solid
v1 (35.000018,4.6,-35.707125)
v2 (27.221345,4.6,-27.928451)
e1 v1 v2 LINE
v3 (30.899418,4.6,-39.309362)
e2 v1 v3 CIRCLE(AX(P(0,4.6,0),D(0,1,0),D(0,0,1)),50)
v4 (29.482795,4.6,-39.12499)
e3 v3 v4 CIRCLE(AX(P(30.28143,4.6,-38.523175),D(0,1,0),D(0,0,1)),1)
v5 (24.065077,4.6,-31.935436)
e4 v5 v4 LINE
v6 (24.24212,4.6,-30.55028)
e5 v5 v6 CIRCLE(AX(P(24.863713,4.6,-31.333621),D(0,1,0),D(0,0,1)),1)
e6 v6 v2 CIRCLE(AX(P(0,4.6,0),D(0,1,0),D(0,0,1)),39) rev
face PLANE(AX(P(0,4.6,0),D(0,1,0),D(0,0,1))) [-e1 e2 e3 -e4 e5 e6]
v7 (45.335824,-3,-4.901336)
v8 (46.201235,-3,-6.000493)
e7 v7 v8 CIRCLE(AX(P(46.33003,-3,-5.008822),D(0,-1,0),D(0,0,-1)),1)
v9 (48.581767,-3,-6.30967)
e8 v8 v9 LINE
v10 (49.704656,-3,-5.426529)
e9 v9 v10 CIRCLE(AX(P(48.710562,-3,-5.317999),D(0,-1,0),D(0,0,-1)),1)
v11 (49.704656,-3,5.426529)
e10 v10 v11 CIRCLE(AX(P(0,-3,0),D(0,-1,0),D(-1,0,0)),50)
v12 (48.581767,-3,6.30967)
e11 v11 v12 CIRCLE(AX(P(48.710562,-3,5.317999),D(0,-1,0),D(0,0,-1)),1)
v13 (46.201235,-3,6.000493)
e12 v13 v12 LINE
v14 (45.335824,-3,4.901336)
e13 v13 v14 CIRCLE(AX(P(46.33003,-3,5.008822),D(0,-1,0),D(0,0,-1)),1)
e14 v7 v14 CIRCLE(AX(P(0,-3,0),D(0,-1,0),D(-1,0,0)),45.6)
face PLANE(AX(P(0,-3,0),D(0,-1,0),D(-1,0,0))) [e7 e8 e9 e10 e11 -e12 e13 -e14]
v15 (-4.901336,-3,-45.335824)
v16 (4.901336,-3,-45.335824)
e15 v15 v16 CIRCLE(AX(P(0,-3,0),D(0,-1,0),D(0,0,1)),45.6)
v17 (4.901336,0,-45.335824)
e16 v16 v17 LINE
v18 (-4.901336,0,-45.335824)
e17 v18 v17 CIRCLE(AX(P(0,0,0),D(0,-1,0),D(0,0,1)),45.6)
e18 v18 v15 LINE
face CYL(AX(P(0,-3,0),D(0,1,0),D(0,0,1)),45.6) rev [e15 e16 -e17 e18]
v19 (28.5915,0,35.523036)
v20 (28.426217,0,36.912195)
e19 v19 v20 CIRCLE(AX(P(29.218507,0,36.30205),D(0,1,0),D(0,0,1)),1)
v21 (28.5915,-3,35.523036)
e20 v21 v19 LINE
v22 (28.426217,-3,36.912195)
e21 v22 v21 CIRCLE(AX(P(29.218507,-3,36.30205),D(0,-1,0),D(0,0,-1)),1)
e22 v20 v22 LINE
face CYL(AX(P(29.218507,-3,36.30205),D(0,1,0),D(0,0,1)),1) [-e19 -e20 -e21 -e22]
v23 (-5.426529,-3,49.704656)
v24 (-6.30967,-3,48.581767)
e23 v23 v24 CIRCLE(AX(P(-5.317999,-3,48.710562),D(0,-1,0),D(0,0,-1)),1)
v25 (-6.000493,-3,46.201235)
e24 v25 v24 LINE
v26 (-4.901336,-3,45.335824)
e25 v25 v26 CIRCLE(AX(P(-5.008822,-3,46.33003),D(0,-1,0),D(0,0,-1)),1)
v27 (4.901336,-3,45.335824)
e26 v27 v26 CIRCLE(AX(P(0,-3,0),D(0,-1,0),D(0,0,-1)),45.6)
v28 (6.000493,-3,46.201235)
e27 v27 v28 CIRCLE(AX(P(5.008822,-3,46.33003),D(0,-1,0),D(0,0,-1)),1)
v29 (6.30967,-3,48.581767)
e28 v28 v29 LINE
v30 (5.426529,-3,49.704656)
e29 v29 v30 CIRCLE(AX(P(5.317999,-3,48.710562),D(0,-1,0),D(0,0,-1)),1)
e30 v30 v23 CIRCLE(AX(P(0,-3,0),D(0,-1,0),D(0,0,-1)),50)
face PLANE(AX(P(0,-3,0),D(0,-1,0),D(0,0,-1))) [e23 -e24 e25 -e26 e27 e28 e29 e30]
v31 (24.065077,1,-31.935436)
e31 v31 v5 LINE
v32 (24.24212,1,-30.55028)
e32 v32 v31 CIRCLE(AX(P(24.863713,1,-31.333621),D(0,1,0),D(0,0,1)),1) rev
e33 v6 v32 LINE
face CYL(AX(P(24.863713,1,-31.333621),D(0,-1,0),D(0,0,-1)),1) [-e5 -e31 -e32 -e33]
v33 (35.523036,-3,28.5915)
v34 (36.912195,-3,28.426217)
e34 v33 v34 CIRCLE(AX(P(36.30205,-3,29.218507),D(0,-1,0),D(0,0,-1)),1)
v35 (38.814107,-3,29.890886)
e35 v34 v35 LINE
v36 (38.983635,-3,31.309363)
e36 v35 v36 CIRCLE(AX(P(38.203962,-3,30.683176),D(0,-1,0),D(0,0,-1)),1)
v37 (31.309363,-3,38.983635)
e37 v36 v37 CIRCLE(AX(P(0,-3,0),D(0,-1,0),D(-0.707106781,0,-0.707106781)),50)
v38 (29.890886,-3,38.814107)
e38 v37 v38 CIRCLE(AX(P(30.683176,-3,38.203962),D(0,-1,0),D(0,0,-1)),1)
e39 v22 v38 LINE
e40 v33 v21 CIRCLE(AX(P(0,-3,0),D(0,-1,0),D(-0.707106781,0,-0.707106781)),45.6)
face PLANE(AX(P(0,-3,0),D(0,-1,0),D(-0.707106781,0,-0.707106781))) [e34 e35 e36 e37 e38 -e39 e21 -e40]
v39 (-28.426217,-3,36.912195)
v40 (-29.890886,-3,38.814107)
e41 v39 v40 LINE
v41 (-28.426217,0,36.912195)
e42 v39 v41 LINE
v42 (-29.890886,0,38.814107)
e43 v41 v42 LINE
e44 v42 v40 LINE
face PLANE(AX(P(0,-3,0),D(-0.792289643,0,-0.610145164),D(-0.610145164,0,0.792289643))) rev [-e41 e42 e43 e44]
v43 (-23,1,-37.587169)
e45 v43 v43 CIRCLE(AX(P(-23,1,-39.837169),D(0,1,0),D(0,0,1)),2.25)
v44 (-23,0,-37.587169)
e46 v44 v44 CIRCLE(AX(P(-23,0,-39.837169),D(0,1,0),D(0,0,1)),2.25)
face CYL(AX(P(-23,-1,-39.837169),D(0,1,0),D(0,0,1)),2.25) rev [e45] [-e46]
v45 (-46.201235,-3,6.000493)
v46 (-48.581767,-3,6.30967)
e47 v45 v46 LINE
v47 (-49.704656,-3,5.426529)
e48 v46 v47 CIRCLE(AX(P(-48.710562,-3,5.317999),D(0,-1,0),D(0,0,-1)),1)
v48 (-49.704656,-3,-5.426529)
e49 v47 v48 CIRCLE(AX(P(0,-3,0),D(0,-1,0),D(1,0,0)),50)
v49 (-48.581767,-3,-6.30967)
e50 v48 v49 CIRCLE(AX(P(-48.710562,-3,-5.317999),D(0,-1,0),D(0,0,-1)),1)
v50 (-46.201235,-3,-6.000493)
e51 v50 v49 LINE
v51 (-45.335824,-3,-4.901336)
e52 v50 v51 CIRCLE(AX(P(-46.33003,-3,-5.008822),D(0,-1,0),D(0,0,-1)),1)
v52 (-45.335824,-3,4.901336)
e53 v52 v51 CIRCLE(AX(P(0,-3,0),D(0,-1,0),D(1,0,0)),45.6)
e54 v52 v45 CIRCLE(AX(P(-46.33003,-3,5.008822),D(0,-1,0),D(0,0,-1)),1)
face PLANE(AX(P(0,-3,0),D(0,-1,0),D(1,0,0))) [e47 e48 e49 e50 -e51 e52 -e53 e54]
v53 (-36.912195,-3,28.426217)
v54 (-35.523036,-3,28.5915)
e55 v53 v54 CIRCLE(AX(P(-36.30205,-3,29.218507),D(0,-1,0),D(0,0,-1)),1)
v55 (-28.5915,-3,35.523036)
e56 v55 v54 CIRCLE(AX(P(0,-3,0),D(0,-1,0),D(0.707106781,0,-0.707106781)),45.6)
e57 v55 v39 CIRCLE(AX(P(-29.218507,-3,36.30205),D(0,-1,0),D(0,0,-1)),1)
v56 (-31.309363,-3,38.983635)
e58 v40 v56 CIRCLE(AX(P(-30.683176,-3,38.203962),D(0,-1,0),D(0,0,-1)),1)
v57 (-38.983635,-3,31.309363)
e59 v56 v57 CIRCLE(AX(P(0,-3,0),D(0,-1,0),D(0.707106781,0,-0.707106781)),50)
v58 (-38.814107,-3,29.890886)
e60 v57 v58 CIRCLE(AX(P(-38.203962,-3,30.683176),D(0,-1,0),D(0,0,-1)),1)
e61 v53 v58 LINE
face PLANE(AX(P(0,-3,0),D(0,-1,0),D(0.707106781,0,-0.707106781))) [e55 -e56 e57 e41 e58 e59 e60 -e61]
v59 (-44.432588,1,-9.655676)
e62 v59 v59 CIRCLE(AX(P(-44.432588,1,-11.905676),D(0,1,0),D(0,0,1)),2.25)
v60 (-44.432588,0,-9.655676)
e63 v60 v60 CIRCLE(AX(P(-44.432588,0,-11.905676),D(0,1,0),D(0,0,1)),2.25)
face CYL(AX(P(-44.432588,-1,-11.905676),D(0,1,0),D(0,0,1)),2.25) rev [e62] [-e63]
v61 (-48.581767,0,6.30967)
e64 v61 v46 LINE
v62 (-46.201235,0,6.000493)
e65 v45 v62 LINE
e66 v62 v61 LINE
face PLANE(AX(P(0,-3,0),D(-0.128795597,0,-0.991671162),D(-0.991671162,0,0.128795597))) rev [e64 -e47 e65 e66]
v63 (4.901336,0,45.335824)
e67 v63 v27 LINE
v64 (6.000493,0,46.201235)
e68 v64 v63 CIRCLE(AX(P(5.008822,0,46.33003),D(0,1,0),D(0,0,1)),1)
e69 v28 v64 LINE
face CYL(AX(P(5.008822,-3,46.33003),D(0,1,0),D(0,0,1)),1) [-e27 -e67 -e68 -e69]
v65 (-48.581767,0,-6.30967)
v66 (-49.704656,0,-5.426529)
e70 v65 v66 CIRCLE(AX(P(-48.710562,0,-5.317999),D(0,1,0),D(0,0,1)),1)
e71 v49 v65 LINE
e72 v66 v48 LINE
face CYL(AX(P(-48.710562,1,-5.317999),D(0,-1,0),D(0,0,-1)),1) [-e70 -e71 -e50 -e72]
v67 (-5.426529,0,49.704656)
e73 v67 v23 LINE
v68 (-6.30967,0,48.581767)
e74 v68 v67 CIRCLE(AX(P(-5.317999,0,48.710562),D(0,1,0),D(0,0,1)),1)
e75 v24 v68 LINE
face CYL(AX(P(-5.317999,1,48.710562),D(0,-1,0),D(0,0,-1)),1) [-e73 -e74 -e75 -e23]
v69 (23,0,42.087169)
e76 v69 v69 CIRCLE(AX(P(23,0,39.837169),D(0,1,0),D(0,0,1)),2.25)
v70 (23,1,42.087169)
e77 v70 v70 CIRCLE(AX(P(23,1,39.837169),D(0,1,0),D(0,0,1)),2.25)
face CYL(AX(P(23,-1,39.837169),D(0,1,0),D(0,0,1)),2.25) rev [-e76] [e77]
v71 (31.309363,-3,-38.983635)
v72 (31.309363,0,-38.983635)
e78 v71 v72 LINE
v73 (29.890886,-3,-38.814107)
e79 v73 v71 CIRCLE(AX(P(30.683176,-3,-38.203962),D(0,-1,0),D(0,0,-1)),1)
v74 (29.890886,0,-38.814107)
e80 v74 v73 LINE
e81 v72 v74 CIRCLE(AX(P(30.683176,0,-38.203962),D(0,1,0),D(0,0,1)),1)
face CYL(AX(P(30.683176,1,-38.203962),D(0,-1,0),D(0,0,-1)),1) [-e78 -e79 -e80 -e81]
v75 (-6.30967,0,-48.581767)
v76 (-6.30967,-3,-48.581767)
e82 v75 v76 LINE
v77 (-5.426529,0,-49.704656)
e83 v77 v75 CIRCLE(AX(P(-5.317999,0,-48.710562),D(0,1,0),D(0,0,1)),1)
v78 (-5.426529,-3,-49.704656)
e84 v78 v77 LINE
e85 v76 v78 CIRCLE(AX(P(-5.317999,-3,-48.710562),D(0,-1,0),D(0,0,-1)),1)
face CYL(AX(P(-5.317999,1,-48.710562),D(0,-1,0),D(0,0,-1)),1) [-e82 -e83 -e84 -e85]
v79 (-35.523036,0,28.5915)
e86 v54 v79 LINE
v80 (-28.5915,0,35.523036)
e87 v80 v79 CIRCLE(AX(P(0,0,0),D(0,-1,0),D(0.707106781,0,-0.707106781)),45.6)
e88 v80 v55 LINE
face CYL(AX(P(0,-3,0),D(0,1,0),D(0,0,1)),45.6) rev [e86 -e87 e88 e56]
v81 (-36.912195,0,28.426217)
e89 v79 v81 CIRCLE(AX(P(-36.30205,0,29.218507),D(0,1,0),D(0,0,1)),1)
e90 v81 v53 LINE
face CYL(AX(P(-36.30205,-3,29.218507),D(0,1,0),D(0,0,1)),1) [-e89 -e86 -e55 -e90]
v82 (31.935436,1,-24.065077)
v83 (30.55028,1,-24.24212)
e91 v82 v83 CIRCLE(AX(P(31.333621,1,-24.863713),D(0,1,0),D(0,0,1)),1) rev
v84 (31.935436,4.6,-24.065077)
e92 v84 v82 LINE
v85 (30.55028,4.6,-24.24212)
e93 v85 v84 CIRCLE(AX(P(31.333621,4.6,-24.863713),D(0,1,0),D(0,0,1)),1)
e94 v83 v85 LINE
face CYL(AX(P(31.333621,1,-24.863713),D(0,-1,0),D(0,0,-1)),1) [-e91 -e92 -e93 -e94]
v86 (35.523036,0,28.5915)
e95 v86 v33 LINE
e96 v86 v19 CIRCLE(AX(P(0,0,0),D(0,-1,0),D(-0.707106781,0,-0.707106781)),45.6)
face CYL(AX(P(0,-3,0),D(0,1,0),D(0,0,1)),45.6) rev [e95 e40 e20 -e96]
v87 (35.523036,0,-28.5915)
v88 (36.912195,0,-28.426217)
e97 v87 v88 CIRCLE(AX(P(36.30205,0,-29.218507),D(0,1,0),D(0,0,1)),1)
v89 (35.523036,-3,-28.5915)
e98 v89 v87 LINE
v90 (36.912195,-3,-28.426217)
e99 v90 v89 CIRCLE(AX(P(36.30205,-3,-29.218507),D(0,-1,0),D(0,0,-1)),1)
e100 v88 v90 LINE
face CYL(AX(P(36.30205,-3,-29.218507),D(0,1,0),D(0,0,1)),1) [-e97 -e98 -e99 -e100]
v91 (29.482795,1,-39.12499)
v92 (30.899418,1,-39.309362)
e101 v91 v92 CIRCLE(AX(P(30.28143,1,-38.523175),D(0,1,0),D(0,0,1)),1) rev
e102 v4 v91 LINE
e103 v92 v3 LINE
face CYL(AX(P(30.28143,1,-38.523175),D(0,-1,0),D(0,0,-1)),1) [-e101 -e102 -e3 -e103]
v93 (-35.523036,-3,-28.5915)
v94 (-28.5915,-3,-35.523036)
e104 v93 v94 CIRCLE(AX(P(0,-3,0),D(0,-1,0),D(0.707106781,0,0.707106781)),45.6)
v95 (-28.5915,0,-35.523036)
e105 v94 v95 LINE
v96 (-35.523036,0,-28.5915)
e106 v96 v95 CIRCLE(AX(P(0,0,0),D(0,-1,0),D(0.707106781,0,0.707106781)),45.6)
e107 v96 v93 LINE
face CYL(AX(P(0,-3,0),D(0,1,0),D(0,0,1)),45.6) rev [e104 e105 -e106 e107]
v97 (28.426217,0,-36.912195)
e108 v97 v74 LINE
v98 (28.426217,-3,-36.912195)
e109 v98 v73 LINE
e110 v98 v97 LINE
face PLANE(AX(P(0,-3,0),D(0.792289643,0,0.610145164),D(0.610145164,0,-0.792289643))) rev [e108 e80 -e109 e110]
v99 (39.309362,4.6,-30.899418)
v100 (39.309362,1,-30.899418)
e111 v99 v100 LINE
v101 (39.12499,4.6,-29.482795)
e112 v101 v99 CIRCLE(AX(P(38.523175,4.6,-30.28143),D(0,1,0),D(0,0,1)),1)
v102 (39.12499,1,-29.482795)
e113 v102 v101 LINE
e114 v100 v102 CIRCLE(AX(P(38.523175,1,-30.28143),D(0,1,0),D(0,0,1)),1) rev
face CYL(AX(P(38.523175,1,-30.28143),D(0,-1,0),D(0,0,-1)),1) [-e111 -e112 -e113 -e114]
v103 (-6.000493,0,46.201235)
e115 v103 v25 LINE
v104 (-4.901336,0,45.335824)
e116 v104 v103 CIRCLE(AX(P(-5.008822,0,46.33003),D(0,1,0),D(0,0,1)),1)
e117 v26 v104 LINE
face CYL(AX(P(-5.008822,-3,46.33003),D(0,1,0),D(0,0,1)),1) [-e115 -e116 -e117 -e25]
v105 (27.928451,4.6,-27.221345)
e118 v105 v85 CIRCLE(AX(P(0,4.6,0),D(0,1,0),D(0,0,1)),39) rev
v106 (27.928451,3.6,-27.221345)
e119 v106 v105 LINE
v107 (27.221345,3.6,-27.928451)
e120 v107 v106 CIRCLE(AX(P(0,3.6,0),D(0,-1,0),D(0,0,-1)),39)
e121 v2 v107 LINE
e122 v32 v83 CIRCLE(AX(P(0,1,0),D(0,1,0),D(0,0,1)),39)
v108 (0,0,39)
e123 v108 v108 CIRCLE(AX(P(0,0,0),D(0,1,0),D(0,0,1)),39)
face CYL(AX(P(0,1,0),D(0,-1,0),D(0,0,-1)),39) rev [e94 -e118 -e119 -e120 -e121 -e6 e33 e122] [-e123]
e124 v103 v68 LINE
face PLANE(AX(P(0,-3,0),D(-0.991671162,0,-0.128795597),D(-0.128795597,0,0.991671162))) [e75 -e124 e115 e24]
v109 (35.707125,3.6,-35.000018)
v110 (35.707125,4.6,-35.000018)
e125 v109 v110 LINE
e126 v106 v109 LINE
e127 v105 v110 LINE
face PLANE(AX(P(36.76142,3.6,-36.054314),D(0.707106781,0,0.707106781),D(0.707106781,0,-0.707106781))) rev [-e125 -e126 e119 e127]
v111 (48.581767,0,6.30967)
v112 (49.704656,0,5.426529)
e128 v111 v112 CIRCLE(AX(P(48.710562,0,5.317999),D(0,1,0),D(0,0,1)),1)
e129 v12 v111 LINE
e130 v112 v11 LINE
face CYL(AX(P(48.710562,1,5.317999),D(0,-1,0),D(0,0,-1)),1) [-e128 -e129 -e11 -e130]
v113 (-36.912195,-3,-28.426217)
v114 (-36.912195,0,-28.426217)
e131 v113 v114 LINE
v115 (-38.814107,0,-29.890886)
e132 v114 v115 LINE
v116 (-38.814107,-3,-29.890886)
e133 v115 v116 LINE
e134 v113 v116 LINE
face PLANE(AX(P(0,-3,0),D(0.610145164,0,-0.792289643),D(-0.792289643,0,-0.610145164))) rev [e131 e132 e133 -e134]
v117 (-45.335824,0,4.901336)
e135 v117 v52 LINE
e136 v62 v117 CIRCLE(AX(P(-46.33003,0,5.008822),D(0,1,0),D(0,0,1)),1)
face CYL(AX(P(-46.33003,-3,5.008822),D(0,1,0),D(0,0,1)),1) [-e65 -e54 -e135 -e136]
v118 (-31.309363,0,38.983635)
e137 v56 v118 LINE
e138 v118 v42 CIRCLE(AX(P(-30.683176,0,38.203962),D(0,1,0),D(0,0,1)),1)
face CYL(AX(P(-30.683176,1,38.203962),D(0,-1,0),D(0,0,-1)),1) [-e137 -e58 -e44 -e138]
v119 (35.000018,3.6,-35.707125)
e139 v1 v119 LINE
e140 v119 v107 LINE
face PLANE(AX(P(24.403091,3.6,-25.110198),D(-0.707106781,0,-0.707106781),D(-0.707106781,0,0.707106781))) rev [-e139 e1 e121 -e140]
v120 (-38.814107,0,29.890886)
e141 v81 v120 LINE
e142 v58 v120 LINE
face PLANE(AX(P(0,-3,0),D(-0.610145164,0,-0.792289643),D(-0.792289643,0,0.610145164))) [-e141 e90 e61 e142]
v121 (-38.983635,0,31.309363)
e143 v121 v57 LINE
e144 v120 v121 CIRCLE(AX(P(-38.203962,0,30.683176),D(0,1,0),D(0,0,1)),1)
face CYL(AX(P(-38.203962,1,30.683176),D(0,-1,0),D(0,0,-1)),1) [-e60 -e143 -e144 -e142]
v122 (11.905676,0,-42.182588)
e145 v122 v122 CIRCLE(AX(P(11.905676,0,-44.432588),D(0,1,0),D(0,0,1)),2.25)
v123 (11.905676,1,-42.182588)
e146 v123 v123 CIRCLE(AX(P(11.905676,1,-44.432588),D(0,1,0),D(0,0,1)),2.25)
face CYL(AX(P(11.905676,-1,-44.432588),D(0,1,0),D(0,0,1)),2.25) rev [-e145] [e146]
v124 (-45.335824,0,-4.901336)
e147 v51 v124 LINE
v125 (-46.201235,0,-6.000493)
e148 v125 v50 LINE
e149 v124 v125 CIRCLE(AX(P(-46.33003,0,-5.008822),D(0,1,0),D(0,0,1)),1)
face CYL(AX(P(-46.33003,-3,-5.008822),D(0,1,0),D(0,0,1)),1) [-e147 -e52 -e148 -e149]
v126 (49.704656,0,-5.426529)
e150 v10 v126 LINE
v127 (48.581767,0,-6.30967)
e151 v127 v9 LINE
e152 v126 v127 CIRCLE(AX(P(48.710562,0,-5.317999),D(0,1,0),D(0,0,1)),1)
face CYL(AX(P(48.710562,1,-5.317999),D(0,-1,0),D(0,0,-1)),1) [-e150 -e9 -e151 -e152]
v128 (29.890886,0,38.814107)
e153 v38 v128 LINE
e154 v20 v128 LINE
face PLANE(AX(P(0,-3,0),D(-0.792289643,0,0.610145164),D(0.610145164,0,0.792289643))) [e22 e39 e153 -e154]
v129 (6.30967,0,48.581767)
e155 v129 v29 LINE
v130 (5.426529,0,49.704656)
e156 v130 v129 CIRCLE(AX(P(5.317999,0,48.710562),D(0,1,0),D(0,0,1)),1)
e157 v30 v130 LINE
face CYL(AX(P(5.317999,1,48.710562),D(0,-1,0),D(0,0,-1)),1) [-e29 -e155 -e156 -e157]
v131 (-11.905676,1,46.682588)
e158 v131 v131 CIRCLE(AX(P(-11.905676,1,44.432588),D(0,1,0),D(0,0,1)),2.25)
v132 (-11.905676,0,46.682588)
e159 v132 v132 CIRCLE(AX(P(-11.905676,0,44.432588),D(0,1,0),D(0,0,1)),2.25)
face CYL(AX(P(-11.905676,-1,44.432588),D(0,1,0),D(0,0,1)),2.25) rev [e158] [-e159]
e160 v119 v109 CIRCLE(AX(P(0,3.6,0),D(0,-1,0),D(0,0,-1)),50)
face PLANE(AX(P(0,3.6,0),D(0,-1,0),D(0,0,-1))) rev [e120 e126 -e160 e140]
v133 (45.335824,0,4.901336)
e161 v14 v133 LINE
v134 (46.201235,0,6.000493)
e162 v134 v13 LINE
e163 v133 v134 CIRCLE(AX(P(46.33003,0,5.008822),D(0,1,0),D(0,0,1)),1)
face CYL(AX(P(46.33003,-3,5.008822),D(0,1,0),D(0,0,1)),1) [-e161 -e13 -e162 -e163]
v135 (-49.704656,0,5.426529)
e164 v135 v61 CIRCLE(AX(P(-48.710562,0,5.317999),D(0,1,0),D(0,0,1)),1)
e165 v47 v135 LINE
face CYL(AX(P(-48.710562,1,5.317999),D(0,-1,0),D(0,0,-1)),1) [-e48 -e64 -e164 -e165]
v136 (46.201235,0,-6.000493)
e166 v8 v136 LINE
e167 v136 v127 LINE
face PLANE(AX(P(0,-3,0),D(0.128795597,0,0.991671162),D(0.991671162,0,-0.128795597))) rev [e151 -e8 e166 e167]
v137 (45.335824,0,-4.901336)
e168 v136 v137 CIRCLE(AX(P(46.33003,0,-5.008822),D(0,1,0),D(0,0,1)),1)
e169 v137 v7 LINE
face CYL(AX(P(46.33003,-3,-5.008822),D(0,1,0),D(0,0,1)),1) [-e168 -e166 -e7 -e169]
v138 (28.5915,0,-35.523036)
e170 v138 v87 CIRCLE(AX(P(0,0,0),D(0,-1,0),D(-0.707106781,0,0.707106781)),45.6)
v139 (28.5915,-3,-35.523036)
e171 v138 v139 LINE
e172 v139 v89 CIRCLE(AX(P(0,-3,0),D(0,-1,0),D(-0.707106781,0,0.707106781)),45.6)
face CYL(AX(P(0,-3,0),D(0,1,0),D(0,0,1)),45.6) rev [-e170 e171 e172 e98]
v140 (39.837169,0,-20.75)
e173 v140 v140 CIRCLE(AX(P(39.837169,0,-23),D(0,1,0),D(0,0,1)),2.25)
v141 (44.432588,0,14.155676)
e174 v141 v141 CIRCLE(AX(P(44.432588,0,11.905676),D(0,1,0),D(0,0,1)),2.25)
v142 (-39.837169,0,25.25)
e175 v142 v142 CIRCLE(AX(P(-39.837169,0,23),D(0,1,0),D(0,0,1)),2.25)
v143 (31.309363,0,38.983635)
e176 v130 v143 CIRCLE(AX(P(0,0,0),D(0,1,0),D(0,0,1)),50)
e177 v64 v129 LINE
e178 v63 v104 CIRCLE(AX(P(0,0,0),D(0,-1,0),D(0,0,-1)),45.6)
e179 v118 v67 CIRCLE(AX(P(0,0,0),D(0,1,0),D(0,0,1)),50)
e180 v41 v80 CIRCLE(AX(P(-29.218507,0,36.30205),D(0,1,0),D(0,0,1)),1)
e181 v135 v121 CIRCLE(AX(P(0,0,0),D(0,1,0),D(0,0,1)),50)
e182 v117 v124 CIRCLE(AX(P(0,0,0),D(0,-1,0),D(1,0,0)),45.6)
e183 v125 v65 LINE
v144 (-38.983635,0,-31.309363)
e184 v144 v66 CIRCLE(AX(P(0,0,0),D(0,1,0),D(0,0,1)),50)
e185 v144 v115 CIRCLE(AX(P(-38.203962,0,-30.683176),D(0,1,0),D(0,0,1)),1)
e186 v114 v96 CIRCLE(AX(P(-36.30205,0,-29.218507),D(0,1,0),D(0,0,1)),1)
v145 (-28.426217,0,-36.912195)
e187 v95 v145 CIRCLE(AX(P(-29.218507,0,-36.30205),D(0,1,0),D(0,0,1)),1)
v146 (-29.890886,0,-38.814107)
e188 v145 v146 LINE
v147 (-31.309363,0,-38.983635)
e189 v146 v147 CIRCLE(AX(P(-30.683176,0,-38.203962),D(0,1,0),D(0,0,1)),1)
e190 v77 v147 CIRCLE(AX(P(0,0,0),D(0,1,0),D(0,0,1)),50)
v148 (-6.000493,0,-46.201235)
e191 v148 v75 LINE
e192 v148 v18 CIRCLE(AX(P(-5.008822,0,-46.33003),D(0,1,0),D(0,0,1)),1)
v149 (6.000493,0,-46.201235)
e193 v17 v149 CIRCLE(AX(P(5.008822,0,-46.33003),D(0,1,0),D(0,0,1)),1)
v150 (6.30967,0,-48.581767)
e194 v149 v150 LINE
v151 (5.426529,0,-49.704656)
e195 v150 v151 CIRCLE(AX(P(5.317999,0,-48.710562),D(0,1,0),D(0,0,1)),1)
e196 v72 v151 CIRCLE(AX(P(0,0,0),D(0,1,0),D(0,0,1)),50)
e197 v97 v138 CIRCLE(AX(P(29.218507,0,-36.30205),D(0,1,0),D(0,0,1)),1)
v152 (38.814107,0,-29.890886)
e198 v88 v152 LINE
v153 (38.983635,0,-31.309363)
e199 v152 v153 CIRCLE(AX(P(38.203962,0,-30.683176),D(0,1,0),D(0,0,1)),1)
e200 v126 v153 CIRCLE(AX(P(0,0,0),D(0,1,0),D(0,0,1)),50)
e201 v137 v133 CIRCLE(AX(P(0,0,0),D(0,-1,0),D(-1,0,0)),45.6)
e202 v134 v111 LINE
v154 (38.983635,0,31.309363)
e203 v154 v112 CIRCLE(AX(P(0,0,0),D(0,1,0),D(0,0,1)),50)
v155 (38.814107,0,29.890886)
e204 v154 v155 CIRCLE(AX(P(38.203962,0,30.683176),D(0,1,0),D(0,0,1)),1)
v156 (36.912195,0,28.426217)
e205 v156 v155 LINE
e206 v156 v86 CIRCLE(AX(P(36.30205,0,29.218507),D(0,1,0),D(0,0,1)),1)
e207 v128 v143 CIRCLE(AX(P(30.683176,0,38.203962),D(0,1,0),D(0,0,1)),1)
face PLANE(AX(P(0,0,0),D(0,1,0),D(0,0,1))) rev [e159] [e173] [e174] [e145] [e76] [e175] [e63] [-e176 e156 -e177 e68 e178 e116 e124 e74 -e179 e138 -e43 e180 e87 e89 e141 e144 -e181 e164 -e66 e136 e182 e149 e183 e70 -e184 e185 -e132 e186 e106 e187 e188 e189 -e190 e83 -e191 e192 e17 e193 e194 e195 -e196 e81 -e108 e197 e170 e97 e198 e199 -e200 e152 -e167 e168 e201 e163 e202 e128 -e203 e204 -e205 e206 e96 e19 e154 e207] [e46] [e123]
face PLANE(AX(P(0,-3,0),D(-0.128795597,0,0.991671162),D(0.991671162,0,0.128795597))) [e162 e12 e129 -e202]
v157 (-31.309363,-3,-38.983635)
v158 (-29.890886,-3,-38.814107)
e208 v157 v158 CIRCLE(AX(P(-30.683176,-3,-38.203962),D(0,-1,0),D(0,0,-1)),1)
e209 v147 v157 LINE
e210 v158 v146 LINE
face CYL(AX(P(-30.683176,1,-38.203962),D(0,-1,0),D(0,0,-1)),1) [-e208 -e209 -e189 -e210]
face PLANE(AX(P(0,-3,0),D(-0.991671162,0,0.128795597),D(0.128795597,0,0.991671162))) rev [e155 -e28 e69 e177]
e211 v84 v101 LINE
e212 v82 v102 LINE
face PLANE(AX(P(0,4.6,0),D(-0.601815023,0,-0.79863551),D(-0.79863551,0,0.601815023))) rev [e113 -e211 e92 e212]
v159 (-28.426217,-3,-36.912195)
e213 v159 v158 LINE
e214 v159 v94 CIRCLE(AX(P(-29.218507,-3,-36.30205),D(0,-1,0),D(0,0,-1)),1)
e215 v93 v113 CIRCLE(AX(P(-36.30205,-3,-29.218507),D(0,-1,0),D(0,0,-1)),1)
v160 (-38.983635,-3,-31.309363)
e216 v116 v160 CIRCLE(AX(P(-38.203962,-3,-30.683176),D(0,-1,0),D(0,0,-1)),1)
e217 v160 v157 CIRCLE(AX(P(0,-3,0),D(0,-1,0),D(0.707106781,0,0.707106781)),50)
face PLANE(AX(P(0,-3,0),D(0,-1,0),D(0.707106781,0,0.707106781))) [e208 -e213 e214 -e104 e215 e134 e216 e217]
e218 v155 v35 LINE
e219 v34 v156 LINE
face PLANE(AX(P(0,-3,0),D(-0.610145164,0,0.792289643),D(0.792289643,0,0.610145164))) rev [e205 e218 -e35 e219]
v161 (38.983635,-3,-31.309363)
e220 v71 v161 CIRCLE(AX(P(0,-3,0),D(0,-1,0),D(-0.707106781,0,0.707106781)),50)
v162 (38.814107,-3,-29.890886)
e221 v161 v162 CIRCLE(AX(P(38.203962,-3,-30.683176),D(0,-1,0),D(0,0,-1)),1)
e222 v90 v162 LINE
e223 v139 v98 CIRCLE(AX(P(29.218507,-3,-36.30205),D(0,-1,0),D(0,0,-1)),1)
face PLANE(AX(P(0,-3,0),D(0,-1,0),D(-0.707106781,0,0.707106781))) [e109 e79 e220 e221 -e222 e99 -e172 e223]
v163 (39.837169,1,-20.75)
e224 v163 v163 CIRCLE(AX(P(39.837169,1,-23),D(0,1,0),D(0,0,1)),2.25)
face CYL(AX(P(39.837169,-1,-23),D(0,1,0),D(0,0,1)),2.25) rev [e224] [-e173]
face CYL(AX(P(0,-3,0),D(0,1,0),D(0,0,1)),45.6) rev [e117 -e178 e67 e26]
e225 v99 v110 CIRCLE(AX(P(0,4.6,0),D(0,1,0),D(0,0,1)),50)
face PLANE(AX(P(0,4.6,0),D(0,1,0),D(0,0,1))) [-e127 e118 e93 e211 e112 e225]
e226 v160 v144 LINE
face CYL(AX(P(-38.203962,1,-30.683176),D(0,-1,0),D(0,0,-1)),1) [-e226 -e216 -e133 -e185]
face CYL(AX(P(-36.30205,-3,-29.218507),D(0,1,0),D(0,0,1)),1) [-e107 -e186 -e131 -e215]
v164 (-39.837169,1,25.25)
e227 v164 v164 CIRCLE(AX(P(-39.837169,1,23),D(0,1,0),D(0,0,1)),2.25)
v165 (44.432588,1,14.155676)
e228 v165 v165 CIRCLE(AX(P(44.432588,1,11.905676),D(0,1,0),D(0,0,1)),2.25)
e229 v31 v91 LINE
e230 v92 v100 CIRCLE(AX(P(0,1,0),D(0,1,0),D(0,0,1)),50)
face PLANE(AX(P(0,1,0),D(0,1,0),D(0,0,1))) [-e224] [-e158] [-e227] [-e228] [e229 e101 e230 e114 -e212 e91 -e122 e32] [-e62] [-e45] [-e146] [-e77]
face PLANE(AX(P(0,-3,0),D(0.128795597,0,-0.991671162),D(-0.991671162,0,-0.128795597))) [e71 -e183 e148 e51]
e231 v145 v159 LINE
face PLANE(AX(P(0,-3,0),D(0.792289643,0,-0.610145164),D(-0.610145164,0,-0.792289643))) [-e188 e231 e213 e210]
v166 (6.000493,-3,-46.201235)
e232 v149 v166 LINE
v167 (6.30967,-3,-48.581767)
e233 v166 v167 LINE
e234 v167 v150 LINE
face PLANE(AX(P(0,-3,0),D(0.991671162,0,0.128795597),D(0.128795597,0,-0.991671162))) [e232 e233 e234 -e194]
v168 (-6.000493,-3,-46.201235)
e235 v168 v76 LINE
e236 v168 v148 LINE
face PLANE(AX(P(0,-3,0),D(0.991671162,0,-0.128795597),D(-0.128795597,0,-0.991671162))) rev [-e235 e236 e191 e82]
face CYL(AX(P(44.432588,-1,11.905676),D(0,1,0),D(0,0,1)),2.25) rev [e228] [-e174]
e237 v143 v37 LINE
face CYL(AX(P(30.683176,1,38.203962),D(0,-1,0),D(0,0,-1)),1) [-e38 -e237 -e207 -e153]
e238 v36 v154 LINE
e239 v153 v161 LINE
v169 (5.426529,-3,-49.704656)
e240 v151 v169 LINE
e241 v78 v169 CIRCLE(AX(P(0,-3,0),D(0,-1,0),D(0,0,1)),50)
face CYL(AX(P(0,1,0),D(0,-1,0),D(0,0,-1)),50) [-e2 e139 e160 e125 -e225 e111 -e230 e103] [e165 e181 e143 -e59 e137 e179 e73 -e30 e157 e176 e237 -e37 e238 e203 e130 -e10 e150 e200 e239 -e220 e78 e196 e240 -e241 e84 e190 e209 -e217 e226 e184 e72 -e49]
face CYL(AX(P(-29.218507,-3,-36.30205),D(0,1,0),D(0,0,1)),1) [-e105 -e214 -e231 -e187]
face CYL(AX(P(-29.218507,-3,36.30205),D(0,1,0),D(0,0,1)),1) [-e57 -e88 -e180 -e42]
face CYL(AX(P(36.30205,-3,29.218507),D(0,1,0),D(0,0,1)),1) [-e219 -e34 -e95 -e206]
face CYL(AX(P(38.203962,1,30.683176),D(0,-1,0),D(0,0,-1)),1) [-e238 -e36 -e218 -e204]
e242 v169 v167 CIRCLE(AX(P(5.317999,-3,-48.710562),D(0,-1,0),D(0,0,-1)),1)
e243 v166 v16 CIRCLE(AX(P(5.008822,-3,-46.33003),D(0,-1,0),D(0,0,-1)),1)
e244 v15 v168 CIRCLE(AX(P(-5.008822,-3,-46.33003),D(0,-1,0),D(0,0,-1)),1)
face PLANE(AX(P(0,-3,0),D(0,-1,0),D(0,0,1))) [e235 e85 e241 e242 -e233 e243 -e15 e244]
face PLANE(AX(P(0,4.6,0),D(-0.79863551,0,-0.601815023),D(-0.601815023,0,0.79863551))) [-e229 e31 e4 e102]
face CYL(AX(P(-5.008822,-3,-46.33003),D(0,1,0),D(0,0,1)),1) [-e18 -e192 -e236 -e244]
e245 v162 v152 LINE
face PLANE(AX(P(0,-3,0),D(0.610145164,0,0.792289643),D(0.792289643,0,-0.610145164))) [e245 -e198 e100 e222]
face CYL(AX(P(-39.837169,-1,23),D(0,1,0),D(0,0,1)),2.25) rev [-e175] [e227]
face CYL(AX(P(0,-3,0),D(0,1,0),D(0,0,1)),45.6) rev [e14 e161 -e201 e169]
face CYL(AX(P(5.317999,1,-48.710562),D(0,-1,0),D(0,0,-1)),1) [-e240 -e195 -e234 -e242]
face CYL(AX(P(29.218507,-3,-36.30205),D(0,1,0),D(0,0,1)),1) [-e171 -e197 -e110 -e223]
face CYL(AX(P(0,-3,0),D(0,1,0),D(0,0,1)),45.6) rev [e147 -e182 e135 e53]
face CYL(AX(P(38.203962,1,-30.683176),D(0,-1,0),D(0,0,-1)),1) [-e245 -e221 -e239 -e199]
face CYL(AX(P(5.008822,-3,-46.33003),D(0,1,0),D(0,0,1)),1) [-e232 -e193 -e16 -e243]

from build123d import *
from build123d.topology import SkipClean

# Parameters (mm, degrees)
SKETCH_1_R               = 50
SKETCH_1_R_2             = 39
EXTRUDE_1_DEPTH          = 1
SKETCH_2_R               = 2.25
CUT_EXTRUDE_1_DEPTH      = 2
EXTRUDE_START            = 3
EXTRUDE_2_DEPTH          = 3
FILLET_1_R               = 1
PATTERN_CIRCULAR_1_COUNT = 8
EXTRUDE_3_DEPTH          = 3.6
FILLET_2_R               = 1
FILLET_3_R               = 1
CUT_EXTRUDE_2_DEPTH      = 1


with BuildPart() as part:
    # 草图1 → 凸台-拉伸1 (new body)
    with BuildSketch(Plane(origin=(0, 0, 0), x_dir=(1, 0, 0), z_dir=(0, 1, 0))):
        with Locations(Location((0, 0, 0), (0, 0, 270))):
            Circle(SKETCH_1_R)
        with Locations(Location((0, 0, 0), (0, 0, 270))):
            Circle(SKETCH_1_R_2, mode=Mode.SUBTRACT)
    extrude(amount=EXTRUDE_1_DEPTH)

    # 草图2 → 切除-拉伸1 (cut)
    with BuildSketch(Plane(origin=(0, 1, 0), x_dir=(1, 0, 0), z_dir=(0, 1, 0))):
        with Locations(Location((11.905676075, 44.432588009, 0), (0, 0, 270))):
            Circle(SKETCH_2_R)
        with Locations(Location((-23, 39.837168574, 0), (0, 0, 270))):
            Circle(SKETCH_2_R)
        with Locations(Location((39.837168574, 23, 0), (0, 0, 270))):
            Circle(SKETCH_2_R)
        with Locations(Location((44.432588009, -11.905676075, 0), (0, 0, 270))):
            Circle(SKETCH_2_R)
        with Locations(Location((23, -39.837168574, 0), (0, 0, 270))):
            Circle(SKETCH_2_R)
        with Locations(Location((-11.905676075, -44.432588009, 0), (0, 0, 270))):
            Circle(SKETCH_2_R)
        with Locations(Location((-39.837168574, -23, 0), (0, 0, 270))):
            Circle(SKETCH_2_R)
        with Locations(Location((-44.432588009, 11.905676075, 0), (0, 0, 270))):
            Circle(SKETCH_2_R)
    extrude(amount=-CUT_EXTRUDE_1_DEPTH, mode=Mode.SUBTRACT)

    # 草图3 → 凸台-拉伸2 (add)
    with BuildSketch(Plane.XZ.offset(EXTRUDE_START)):
        with BuildLine():
            ThreePointArc((-5.873079204, 45.220205005), (-2.942673256, 45.504952193), (0, 45.6))
            Line((0, 45.6), (0, 50))
            ThreePointArc((0, 50), (-3.226615413, 49.895780914), (-6.439779829, 49.583558119))
            Line((-6.439779829, 49.583558119), (-5.873079204, 45.220205005))
        make_face()
        with BuildLine():
            Line((0, 50), (0, 45.6))
            ThreePointArc((0, 45.6), (2.942673256, 45.504952193), (5.873079204, 45.220205005))
            Line((5.873079204, 45.220205005), (6.439779829, 49.583558119))
            ThreePointArc((6.439779829, 49.583558119), (3.226615413, 49.895780914), (0, 50))
        make_face()
    extrude_2 = extrude(amount=-EXTRUDE_2_DEPTH)

    # 圆角1
    fillet_1_edges = [part.edges().sort_by_distance(p)[0] for p in [
        (-5.873079204, -1.5, 45.220205005),
        (5.873079204, -1.5, 45.220205005),
    ]]
    fillet(fillet_1_edges, radius=FILLET_1_R)

    # 阵列(圆周)1: 凸台-拉伸2 ×8 about axis
    with SkipClean():  # the faces are left unmerged after this step: merging them gives an invalid solid
        pattern_circular_1_axis = Axis((0, 0, 0), (0, 1, 0))
        for i in range(1, PATTERN_CIRCULAR_1_COUNT):
            add(extrude_2.rotate(pattern_circular_1_axis, i * 360 / PATTERN_CIRCULAR_1_COUNT))

    # 草图4 → 凸台-拉伸3 (add)
    with SkipClean():  # the faces are left unmerged after this step: merging them gives an invalid solid
        with BuildSketch(Plane(origin=(0, 1, 0), x_dir=(1, 0, 0), z_dir=(0, 1, 0))):
            with BuildLine():
                ThreePointArc((23.470785903, 31.146784892), (27.577164466, 27.577164466), (31.146784892, 23.470785903))
                Line((31.146784892, 23.470785903), (39.931775502, 30.090751158))
                ThreePointArc((39.931775502, 30.090751158), (35.355339059, 35.355339059), (30.090751158, 39.931775502))
                Line((30.090751158, 39.931775502), (23.470785903, 31.146784892))
            make_face()
        extrude(amount=EXTRUDE_3_DEPTH)

    # 圆角2
    # the kernel refuses this fillet: 1 mm, written as the material it takes off along each edge
    with BuildSketch(Plane(origin=(30.090751158, 1, -39.931775502), x_dir=(0.7924526369681321, 0, 0.6099334538802196), z_dir=(0, 1, 0))) as fillet_2_piece_1:
        with BuildLine():
            CenterArc((1.010256684, -0.999947932), FILLET_2_R, 89.415308597, 91.169382806)
            Line((0.010308753, -1.010152545), (0, 0))
            ThreePointArc((0, 0), (0.510230649, 0.002603421), (1.020461297, 0))
        make_face()
    extrude(amount=6.151153243, mode=Mode.SUBTRACT)
    with BuildSketch(Plane(origin=(23.470785903, 1, -31.146784892), x_dir=(0.791049828797745, 0, 0.6117517211737605), z_dir=(0, 1, 0))) as fillet_2_piece_2:
        with BuildLine():
            CenterArc((0.98757717, 0.99992186), FILLET_2_R, 180.716271869, 88.567456262)
            Line((-0.01234469, 0.987420883), (0, 0))
            ThreePointArc((0, 0), (0.487538096, 0.00304747), (0.975076193, 0))
        make_face()
    extrude(amount=6.068745116, mode=Mode.SUBTRACT)
    with BuildSketch(Plane(origin=(31.146784892, 1, -23.470785903), x_dir=(-0.611751721173858, 0, -0.7910498287976696), z_dir=(0, 1, 0))) as fillet_2_piece_3:
        with BuildLine():
            CenterArc((0.98757717, -0.99992186), FILLET_2_R, 90.716271869, 88.567456262)
            Line((-0.01234469, -0.987420883), (0, 0))
            ThreePointArc((0, 0), (0.487538096, -0.00304747), (0.975076193, 0))
        make_face()
    extrude(amount=6.068745116, mode=Mode.SUBTRACT)
    with BuildSketch(Plane(origin=(39.931775502, 1, -30.090751158), x_dir=(-0.6099334538803046, 0, -0.7924526369680664), z_dir=(0, 1, 0))) as fillet_2_piece_4:
        with BuildLine():
            CenterArc((1.010256684, 0.999947932), FILLET_2_R, 179.415308597, 91.169382806)
            Line((0.010308753, 1.010152545), (0, 0))
            ThreePointArc((0, 0), (0.510230649, -0.002603421), (1.020461297, 0))
        make_face()
    extrude(amount=6.151153243, mode=Mode.SUBTRACT)

    # 圆角3
    # the kernel refuses this fillet: 1 mm, written as the material it takes off along each edge
    with BuildSketch(Plane(origin=(5.873079204, -5.473172877, -45.220205005), x_dir=(-0.9929960778530438, 0, -0.11814732061486549), z_dir=(0, 1, 0)), Plane(origin=(-27.822619474, -5.473172877, -36.128407737), x_dir=(-0.7856970319273249, 0, 0.6186114887557392), z_dir=(0, 1, 0)), Plane(origin=(-45.220205005, -5.473172877, -5.873079204), x_dir=(-0.11814732061486613, 0, 0.9929960778530437), z_dir=(0, 1, 0)), Plane(origin=(-36.128407737, -5.473172877, 27.822619474), x_dir=(0.6186114887557375, 0, 0.7856970319273263), z_dir=(0, 1, 0)), Plane(origin=(27.822619474, -5.473172877, 36.128407737), x_dir=(0.7856970319273222, 0, -0.6186114887557427), z_dir=(0, 1, 0)), Plane(origin=(45.220205005, -5.473172877, 5.873079204), x_dir=(0.11814732061486592, 0, -0.9929960778530437), z_dir=(0, 1, 0)), Plane(origin=(36.128407737, -5.473172877, -27.822619474), x_dir=(-0.6186114887557427, 0, -0.7856970319273222), z_dir=(0, 1, 0))) as fillet_3_piece_1:
        with BuildLine():
            CenterArc((0.989327342, -0.999942429), FILLET_3_R, 90.614808775, 88.770382449)
            Line((-0.010615087, -0.989212198), (0, 0))
            ThreePointArc((0, 0), (0.489298555, -0.002625219), (0.978597111, 0))
        make_face()
    extrude(amount=5.473172877, mode=Mode.SUBTRACT)
    with BuildSketch(Plane(origin=(-5.873079204, -5.473172877, -45.220205005), x_dir=(-0.1287955965775636, 0, -0.9916711623830904), z_dir=(0, 1, 0)), Plane(origin=(-36.128407737, -5.473172877, -27.822619474), x_dir=(-0.7922896433551908, 0, -0.6101451639012675), z_dir=(0, 1, 0)), Plane(origin=(-45.220205005, -5.473172877, 5.873079204), x_dir=(-0.9916711623830903, 0, 0.12879559657756398), z_dir=(0, 1, 0)), Plane(origin=(-27.822619474, -5.473172877, 36.128407737), x_dir=(-0.6101451639012675, 0, 0.7922896433551908), z_dir=(0, 1, 0)), Plane(origin=(36.128407737, -5.473172877, 27.822619474), x_dir=(0.7922896433551925, 0, 0.6101451639012652), z_dir=(0, 1, 0)), Plane(origin=(45.220205005, -5.473172877, -5.873079204), x_dir=(0.9916711623830904, 0, -0.1287955965775636), z_dir=(0, 1, 0)), Plane(origin=(27.822619474, -5.473172877, -36.128407737), x_dir=(0.6101451639012653, 0, -0.7922896433551926), z_dir=(0, 1, 0))) as fillet_3_piece_2:
        with BuildLine():
            CenterArc((0.989269151, -1), FILLET_3_R, 90, 88.770382449)
            ThreePointArc((-0.010500574, -0.978540773), (-0.002625219, -0.489298555), (0, 0))
            Line((0, 0), (0.989269151, 0))
        make_face()
    extrude(amount=5.473172877, mode=Mode.SUBTRACT)
    with BuildSketch(Plane(origin=(-6.439779829, -5.551153243, -49.583558119), x_dir=(0.9929338368493981, 0, -0.1186692699882022), z_dir=(0, 1, 0)), Plane(origin=(6.439779829, -5.551153243, 49.583558119), x_dir=(-0.9929338368493983, 0, 0.1186692699882015), z_dir=(0, 1, 0)), Plane(origin=(39.614482168, -5.551153243, 30.507258195), x_dir=(-0.6181984037786714, 0, 0.7860220948329013), z_dir=(0, 1, 0)), Plane(origin=(49.583558119, -5.551153243, -6.439779829), x_dir=(0.11866926998820088, 0, 0.9929338368493983), z_dir=(0, 1, 0)), Plane(origin=(30.507258195, -5.551153243, -39.614482168), x_dir=(0.7860220948329028, 0, 0.6181984037786699), z_dir=(0, 1, 0))) as fillet_3_piece_3:
        with BuildLine():
            CenterArc((1.010256684, -0.999947932), FILLET_3_R, 89.415308597, 91.169382806)
            Line((0.010308753, -1.010152545), (0, 0))
            ThreePointArc((0, 0), (0.510230649, 0.002603421), (1.020461297, 0))
        make_face()
    extrude(amount=5.551153243, mode=Mode.SUBTRACT)
    with BuildSketch(Plane(origin=(6.439779829, -5.551153243, -49.583558119), x_dir=(-0.9929338368493981, 0, -0.1186692699882022), z_dir=(0, 1, 0)), Plane(origin=(30.507258195, -5.551153243, 39.614482168), x_dir=(0.7860220948329047, 0, -0.6181984037786672), z_dir=(0, 1, 0)), Plane(origin=(49.583558119, -5.551153243, 6.439779829), x_dir=(0.11866926998820333, 0, -0.992933836849398), z_dir=(0, 1, 0)), Plane(origin=(39.614482168, -5.551153243, -30.507258195), x_dir=(-0.6181984037786714, 0, -0.7860220948329013), z_dir=(0, 1, 0))) as fillet_3_piece_4:
        with BuildLine():
            CenterArc((1.010256684, 0.999947932), FILLET_3_R, 179.415308597, 91.169382806)
            Line((0.010308753, 1.010152545), (0, 0))
            ThreePointArc((0, 0), (0.510230649, -0.002603421), (1.020461297, 0))
        make_face()
    extrude(amount=5.551153243, mode=Mode.SUBTRACT)
    with BuildSketch(Plane(origin=(-39.614482168, -5.551153243, -30.507258195), x_dir=(0.7922896433551889, 0, 0.61014516390127), z_dir=(0, 1, 0)), Plane(origin=(-49.583558119, -5.551153243, 6.439779829), x_dir=(0.9916711623830904, 0, -0.12879559657756223), z_dir=(0, 1, 0)), Plane(origin=(-30.507258195, -5.551153243, 39.614482168), x_dir=(0.6101451639012682, 0, -0.7922896433551903), z_dir=(0, 1, 0))) as fillet_3_piece_5:
        with BuildLine():
            CenterArc((1.010205144, 1), FILLET_3_R, 178.830617194, 91.169382806)
            ThreePointArc((0.010413413, 1.020408163), (0.002603421, 0.510230649), (0, 0))
            Line((0, 0), (1.010205144, 0))
        make_face()
    extrude(amount=5.551153243, mode=Mode.SUBTRACT)
    with BuildSketch(Plane(origin=(-30.507258195, -5.551153243, -39.614482168), x_dir=(0.6101451639012663, 0, 0.7922896433551917), z_dir=(0, 1, 0)), Plane(origin=(-49.583558119, -5.551153243, -6.439779829), x_dir=(0.9916711623830905, 0, 0.1287955965775631), z_dir=(0, 1, 0)), Plane(origin=(-39.614482168, -5.551153243, 30.507258195), x_dir=(0.7922896433551917, 0, -0.6101451639012663), z_dir=(0, 1, 0)), Plane(origin=(-6.439779829, -5.551153243, 49.583558119), x_dir=(0.1287955965775631, 0, -0.9916711623830905), z_dir=(0, 1, 0))) as fillet_3_piece_6:
        with BuildLine():
            CenterArc((1.010205144, -1), FILLET_3_R, 90, 91.169382806)
            ThreePointArc((0.010413413, -1.020408163), (0.002603421, -0.510230649), (0, 0))
            Line((0, 0), (1.010205144, 0))
        make_face()
    extrude(amount=5.551153243, mode=Mode.SUBTRACT)

    # 草图5 → 切除-拉伸2 (cut)
    with BuildSketch(Plane(origin=(0, 4.6, 0), x_dir=(1, 0, 0), z_dir=(0, 1, 0))):
        Polygon((36.054313611, 36.761420392), (36.761420392, 36.054313611), (25.110197925, 24.403091144), (24.403091144, 25.110197925), align=None)
    extrude(amount=-CUT_EXTRUDE_2_DEPTH, mode=Mode.SUBTRACT)


solid = part.part
